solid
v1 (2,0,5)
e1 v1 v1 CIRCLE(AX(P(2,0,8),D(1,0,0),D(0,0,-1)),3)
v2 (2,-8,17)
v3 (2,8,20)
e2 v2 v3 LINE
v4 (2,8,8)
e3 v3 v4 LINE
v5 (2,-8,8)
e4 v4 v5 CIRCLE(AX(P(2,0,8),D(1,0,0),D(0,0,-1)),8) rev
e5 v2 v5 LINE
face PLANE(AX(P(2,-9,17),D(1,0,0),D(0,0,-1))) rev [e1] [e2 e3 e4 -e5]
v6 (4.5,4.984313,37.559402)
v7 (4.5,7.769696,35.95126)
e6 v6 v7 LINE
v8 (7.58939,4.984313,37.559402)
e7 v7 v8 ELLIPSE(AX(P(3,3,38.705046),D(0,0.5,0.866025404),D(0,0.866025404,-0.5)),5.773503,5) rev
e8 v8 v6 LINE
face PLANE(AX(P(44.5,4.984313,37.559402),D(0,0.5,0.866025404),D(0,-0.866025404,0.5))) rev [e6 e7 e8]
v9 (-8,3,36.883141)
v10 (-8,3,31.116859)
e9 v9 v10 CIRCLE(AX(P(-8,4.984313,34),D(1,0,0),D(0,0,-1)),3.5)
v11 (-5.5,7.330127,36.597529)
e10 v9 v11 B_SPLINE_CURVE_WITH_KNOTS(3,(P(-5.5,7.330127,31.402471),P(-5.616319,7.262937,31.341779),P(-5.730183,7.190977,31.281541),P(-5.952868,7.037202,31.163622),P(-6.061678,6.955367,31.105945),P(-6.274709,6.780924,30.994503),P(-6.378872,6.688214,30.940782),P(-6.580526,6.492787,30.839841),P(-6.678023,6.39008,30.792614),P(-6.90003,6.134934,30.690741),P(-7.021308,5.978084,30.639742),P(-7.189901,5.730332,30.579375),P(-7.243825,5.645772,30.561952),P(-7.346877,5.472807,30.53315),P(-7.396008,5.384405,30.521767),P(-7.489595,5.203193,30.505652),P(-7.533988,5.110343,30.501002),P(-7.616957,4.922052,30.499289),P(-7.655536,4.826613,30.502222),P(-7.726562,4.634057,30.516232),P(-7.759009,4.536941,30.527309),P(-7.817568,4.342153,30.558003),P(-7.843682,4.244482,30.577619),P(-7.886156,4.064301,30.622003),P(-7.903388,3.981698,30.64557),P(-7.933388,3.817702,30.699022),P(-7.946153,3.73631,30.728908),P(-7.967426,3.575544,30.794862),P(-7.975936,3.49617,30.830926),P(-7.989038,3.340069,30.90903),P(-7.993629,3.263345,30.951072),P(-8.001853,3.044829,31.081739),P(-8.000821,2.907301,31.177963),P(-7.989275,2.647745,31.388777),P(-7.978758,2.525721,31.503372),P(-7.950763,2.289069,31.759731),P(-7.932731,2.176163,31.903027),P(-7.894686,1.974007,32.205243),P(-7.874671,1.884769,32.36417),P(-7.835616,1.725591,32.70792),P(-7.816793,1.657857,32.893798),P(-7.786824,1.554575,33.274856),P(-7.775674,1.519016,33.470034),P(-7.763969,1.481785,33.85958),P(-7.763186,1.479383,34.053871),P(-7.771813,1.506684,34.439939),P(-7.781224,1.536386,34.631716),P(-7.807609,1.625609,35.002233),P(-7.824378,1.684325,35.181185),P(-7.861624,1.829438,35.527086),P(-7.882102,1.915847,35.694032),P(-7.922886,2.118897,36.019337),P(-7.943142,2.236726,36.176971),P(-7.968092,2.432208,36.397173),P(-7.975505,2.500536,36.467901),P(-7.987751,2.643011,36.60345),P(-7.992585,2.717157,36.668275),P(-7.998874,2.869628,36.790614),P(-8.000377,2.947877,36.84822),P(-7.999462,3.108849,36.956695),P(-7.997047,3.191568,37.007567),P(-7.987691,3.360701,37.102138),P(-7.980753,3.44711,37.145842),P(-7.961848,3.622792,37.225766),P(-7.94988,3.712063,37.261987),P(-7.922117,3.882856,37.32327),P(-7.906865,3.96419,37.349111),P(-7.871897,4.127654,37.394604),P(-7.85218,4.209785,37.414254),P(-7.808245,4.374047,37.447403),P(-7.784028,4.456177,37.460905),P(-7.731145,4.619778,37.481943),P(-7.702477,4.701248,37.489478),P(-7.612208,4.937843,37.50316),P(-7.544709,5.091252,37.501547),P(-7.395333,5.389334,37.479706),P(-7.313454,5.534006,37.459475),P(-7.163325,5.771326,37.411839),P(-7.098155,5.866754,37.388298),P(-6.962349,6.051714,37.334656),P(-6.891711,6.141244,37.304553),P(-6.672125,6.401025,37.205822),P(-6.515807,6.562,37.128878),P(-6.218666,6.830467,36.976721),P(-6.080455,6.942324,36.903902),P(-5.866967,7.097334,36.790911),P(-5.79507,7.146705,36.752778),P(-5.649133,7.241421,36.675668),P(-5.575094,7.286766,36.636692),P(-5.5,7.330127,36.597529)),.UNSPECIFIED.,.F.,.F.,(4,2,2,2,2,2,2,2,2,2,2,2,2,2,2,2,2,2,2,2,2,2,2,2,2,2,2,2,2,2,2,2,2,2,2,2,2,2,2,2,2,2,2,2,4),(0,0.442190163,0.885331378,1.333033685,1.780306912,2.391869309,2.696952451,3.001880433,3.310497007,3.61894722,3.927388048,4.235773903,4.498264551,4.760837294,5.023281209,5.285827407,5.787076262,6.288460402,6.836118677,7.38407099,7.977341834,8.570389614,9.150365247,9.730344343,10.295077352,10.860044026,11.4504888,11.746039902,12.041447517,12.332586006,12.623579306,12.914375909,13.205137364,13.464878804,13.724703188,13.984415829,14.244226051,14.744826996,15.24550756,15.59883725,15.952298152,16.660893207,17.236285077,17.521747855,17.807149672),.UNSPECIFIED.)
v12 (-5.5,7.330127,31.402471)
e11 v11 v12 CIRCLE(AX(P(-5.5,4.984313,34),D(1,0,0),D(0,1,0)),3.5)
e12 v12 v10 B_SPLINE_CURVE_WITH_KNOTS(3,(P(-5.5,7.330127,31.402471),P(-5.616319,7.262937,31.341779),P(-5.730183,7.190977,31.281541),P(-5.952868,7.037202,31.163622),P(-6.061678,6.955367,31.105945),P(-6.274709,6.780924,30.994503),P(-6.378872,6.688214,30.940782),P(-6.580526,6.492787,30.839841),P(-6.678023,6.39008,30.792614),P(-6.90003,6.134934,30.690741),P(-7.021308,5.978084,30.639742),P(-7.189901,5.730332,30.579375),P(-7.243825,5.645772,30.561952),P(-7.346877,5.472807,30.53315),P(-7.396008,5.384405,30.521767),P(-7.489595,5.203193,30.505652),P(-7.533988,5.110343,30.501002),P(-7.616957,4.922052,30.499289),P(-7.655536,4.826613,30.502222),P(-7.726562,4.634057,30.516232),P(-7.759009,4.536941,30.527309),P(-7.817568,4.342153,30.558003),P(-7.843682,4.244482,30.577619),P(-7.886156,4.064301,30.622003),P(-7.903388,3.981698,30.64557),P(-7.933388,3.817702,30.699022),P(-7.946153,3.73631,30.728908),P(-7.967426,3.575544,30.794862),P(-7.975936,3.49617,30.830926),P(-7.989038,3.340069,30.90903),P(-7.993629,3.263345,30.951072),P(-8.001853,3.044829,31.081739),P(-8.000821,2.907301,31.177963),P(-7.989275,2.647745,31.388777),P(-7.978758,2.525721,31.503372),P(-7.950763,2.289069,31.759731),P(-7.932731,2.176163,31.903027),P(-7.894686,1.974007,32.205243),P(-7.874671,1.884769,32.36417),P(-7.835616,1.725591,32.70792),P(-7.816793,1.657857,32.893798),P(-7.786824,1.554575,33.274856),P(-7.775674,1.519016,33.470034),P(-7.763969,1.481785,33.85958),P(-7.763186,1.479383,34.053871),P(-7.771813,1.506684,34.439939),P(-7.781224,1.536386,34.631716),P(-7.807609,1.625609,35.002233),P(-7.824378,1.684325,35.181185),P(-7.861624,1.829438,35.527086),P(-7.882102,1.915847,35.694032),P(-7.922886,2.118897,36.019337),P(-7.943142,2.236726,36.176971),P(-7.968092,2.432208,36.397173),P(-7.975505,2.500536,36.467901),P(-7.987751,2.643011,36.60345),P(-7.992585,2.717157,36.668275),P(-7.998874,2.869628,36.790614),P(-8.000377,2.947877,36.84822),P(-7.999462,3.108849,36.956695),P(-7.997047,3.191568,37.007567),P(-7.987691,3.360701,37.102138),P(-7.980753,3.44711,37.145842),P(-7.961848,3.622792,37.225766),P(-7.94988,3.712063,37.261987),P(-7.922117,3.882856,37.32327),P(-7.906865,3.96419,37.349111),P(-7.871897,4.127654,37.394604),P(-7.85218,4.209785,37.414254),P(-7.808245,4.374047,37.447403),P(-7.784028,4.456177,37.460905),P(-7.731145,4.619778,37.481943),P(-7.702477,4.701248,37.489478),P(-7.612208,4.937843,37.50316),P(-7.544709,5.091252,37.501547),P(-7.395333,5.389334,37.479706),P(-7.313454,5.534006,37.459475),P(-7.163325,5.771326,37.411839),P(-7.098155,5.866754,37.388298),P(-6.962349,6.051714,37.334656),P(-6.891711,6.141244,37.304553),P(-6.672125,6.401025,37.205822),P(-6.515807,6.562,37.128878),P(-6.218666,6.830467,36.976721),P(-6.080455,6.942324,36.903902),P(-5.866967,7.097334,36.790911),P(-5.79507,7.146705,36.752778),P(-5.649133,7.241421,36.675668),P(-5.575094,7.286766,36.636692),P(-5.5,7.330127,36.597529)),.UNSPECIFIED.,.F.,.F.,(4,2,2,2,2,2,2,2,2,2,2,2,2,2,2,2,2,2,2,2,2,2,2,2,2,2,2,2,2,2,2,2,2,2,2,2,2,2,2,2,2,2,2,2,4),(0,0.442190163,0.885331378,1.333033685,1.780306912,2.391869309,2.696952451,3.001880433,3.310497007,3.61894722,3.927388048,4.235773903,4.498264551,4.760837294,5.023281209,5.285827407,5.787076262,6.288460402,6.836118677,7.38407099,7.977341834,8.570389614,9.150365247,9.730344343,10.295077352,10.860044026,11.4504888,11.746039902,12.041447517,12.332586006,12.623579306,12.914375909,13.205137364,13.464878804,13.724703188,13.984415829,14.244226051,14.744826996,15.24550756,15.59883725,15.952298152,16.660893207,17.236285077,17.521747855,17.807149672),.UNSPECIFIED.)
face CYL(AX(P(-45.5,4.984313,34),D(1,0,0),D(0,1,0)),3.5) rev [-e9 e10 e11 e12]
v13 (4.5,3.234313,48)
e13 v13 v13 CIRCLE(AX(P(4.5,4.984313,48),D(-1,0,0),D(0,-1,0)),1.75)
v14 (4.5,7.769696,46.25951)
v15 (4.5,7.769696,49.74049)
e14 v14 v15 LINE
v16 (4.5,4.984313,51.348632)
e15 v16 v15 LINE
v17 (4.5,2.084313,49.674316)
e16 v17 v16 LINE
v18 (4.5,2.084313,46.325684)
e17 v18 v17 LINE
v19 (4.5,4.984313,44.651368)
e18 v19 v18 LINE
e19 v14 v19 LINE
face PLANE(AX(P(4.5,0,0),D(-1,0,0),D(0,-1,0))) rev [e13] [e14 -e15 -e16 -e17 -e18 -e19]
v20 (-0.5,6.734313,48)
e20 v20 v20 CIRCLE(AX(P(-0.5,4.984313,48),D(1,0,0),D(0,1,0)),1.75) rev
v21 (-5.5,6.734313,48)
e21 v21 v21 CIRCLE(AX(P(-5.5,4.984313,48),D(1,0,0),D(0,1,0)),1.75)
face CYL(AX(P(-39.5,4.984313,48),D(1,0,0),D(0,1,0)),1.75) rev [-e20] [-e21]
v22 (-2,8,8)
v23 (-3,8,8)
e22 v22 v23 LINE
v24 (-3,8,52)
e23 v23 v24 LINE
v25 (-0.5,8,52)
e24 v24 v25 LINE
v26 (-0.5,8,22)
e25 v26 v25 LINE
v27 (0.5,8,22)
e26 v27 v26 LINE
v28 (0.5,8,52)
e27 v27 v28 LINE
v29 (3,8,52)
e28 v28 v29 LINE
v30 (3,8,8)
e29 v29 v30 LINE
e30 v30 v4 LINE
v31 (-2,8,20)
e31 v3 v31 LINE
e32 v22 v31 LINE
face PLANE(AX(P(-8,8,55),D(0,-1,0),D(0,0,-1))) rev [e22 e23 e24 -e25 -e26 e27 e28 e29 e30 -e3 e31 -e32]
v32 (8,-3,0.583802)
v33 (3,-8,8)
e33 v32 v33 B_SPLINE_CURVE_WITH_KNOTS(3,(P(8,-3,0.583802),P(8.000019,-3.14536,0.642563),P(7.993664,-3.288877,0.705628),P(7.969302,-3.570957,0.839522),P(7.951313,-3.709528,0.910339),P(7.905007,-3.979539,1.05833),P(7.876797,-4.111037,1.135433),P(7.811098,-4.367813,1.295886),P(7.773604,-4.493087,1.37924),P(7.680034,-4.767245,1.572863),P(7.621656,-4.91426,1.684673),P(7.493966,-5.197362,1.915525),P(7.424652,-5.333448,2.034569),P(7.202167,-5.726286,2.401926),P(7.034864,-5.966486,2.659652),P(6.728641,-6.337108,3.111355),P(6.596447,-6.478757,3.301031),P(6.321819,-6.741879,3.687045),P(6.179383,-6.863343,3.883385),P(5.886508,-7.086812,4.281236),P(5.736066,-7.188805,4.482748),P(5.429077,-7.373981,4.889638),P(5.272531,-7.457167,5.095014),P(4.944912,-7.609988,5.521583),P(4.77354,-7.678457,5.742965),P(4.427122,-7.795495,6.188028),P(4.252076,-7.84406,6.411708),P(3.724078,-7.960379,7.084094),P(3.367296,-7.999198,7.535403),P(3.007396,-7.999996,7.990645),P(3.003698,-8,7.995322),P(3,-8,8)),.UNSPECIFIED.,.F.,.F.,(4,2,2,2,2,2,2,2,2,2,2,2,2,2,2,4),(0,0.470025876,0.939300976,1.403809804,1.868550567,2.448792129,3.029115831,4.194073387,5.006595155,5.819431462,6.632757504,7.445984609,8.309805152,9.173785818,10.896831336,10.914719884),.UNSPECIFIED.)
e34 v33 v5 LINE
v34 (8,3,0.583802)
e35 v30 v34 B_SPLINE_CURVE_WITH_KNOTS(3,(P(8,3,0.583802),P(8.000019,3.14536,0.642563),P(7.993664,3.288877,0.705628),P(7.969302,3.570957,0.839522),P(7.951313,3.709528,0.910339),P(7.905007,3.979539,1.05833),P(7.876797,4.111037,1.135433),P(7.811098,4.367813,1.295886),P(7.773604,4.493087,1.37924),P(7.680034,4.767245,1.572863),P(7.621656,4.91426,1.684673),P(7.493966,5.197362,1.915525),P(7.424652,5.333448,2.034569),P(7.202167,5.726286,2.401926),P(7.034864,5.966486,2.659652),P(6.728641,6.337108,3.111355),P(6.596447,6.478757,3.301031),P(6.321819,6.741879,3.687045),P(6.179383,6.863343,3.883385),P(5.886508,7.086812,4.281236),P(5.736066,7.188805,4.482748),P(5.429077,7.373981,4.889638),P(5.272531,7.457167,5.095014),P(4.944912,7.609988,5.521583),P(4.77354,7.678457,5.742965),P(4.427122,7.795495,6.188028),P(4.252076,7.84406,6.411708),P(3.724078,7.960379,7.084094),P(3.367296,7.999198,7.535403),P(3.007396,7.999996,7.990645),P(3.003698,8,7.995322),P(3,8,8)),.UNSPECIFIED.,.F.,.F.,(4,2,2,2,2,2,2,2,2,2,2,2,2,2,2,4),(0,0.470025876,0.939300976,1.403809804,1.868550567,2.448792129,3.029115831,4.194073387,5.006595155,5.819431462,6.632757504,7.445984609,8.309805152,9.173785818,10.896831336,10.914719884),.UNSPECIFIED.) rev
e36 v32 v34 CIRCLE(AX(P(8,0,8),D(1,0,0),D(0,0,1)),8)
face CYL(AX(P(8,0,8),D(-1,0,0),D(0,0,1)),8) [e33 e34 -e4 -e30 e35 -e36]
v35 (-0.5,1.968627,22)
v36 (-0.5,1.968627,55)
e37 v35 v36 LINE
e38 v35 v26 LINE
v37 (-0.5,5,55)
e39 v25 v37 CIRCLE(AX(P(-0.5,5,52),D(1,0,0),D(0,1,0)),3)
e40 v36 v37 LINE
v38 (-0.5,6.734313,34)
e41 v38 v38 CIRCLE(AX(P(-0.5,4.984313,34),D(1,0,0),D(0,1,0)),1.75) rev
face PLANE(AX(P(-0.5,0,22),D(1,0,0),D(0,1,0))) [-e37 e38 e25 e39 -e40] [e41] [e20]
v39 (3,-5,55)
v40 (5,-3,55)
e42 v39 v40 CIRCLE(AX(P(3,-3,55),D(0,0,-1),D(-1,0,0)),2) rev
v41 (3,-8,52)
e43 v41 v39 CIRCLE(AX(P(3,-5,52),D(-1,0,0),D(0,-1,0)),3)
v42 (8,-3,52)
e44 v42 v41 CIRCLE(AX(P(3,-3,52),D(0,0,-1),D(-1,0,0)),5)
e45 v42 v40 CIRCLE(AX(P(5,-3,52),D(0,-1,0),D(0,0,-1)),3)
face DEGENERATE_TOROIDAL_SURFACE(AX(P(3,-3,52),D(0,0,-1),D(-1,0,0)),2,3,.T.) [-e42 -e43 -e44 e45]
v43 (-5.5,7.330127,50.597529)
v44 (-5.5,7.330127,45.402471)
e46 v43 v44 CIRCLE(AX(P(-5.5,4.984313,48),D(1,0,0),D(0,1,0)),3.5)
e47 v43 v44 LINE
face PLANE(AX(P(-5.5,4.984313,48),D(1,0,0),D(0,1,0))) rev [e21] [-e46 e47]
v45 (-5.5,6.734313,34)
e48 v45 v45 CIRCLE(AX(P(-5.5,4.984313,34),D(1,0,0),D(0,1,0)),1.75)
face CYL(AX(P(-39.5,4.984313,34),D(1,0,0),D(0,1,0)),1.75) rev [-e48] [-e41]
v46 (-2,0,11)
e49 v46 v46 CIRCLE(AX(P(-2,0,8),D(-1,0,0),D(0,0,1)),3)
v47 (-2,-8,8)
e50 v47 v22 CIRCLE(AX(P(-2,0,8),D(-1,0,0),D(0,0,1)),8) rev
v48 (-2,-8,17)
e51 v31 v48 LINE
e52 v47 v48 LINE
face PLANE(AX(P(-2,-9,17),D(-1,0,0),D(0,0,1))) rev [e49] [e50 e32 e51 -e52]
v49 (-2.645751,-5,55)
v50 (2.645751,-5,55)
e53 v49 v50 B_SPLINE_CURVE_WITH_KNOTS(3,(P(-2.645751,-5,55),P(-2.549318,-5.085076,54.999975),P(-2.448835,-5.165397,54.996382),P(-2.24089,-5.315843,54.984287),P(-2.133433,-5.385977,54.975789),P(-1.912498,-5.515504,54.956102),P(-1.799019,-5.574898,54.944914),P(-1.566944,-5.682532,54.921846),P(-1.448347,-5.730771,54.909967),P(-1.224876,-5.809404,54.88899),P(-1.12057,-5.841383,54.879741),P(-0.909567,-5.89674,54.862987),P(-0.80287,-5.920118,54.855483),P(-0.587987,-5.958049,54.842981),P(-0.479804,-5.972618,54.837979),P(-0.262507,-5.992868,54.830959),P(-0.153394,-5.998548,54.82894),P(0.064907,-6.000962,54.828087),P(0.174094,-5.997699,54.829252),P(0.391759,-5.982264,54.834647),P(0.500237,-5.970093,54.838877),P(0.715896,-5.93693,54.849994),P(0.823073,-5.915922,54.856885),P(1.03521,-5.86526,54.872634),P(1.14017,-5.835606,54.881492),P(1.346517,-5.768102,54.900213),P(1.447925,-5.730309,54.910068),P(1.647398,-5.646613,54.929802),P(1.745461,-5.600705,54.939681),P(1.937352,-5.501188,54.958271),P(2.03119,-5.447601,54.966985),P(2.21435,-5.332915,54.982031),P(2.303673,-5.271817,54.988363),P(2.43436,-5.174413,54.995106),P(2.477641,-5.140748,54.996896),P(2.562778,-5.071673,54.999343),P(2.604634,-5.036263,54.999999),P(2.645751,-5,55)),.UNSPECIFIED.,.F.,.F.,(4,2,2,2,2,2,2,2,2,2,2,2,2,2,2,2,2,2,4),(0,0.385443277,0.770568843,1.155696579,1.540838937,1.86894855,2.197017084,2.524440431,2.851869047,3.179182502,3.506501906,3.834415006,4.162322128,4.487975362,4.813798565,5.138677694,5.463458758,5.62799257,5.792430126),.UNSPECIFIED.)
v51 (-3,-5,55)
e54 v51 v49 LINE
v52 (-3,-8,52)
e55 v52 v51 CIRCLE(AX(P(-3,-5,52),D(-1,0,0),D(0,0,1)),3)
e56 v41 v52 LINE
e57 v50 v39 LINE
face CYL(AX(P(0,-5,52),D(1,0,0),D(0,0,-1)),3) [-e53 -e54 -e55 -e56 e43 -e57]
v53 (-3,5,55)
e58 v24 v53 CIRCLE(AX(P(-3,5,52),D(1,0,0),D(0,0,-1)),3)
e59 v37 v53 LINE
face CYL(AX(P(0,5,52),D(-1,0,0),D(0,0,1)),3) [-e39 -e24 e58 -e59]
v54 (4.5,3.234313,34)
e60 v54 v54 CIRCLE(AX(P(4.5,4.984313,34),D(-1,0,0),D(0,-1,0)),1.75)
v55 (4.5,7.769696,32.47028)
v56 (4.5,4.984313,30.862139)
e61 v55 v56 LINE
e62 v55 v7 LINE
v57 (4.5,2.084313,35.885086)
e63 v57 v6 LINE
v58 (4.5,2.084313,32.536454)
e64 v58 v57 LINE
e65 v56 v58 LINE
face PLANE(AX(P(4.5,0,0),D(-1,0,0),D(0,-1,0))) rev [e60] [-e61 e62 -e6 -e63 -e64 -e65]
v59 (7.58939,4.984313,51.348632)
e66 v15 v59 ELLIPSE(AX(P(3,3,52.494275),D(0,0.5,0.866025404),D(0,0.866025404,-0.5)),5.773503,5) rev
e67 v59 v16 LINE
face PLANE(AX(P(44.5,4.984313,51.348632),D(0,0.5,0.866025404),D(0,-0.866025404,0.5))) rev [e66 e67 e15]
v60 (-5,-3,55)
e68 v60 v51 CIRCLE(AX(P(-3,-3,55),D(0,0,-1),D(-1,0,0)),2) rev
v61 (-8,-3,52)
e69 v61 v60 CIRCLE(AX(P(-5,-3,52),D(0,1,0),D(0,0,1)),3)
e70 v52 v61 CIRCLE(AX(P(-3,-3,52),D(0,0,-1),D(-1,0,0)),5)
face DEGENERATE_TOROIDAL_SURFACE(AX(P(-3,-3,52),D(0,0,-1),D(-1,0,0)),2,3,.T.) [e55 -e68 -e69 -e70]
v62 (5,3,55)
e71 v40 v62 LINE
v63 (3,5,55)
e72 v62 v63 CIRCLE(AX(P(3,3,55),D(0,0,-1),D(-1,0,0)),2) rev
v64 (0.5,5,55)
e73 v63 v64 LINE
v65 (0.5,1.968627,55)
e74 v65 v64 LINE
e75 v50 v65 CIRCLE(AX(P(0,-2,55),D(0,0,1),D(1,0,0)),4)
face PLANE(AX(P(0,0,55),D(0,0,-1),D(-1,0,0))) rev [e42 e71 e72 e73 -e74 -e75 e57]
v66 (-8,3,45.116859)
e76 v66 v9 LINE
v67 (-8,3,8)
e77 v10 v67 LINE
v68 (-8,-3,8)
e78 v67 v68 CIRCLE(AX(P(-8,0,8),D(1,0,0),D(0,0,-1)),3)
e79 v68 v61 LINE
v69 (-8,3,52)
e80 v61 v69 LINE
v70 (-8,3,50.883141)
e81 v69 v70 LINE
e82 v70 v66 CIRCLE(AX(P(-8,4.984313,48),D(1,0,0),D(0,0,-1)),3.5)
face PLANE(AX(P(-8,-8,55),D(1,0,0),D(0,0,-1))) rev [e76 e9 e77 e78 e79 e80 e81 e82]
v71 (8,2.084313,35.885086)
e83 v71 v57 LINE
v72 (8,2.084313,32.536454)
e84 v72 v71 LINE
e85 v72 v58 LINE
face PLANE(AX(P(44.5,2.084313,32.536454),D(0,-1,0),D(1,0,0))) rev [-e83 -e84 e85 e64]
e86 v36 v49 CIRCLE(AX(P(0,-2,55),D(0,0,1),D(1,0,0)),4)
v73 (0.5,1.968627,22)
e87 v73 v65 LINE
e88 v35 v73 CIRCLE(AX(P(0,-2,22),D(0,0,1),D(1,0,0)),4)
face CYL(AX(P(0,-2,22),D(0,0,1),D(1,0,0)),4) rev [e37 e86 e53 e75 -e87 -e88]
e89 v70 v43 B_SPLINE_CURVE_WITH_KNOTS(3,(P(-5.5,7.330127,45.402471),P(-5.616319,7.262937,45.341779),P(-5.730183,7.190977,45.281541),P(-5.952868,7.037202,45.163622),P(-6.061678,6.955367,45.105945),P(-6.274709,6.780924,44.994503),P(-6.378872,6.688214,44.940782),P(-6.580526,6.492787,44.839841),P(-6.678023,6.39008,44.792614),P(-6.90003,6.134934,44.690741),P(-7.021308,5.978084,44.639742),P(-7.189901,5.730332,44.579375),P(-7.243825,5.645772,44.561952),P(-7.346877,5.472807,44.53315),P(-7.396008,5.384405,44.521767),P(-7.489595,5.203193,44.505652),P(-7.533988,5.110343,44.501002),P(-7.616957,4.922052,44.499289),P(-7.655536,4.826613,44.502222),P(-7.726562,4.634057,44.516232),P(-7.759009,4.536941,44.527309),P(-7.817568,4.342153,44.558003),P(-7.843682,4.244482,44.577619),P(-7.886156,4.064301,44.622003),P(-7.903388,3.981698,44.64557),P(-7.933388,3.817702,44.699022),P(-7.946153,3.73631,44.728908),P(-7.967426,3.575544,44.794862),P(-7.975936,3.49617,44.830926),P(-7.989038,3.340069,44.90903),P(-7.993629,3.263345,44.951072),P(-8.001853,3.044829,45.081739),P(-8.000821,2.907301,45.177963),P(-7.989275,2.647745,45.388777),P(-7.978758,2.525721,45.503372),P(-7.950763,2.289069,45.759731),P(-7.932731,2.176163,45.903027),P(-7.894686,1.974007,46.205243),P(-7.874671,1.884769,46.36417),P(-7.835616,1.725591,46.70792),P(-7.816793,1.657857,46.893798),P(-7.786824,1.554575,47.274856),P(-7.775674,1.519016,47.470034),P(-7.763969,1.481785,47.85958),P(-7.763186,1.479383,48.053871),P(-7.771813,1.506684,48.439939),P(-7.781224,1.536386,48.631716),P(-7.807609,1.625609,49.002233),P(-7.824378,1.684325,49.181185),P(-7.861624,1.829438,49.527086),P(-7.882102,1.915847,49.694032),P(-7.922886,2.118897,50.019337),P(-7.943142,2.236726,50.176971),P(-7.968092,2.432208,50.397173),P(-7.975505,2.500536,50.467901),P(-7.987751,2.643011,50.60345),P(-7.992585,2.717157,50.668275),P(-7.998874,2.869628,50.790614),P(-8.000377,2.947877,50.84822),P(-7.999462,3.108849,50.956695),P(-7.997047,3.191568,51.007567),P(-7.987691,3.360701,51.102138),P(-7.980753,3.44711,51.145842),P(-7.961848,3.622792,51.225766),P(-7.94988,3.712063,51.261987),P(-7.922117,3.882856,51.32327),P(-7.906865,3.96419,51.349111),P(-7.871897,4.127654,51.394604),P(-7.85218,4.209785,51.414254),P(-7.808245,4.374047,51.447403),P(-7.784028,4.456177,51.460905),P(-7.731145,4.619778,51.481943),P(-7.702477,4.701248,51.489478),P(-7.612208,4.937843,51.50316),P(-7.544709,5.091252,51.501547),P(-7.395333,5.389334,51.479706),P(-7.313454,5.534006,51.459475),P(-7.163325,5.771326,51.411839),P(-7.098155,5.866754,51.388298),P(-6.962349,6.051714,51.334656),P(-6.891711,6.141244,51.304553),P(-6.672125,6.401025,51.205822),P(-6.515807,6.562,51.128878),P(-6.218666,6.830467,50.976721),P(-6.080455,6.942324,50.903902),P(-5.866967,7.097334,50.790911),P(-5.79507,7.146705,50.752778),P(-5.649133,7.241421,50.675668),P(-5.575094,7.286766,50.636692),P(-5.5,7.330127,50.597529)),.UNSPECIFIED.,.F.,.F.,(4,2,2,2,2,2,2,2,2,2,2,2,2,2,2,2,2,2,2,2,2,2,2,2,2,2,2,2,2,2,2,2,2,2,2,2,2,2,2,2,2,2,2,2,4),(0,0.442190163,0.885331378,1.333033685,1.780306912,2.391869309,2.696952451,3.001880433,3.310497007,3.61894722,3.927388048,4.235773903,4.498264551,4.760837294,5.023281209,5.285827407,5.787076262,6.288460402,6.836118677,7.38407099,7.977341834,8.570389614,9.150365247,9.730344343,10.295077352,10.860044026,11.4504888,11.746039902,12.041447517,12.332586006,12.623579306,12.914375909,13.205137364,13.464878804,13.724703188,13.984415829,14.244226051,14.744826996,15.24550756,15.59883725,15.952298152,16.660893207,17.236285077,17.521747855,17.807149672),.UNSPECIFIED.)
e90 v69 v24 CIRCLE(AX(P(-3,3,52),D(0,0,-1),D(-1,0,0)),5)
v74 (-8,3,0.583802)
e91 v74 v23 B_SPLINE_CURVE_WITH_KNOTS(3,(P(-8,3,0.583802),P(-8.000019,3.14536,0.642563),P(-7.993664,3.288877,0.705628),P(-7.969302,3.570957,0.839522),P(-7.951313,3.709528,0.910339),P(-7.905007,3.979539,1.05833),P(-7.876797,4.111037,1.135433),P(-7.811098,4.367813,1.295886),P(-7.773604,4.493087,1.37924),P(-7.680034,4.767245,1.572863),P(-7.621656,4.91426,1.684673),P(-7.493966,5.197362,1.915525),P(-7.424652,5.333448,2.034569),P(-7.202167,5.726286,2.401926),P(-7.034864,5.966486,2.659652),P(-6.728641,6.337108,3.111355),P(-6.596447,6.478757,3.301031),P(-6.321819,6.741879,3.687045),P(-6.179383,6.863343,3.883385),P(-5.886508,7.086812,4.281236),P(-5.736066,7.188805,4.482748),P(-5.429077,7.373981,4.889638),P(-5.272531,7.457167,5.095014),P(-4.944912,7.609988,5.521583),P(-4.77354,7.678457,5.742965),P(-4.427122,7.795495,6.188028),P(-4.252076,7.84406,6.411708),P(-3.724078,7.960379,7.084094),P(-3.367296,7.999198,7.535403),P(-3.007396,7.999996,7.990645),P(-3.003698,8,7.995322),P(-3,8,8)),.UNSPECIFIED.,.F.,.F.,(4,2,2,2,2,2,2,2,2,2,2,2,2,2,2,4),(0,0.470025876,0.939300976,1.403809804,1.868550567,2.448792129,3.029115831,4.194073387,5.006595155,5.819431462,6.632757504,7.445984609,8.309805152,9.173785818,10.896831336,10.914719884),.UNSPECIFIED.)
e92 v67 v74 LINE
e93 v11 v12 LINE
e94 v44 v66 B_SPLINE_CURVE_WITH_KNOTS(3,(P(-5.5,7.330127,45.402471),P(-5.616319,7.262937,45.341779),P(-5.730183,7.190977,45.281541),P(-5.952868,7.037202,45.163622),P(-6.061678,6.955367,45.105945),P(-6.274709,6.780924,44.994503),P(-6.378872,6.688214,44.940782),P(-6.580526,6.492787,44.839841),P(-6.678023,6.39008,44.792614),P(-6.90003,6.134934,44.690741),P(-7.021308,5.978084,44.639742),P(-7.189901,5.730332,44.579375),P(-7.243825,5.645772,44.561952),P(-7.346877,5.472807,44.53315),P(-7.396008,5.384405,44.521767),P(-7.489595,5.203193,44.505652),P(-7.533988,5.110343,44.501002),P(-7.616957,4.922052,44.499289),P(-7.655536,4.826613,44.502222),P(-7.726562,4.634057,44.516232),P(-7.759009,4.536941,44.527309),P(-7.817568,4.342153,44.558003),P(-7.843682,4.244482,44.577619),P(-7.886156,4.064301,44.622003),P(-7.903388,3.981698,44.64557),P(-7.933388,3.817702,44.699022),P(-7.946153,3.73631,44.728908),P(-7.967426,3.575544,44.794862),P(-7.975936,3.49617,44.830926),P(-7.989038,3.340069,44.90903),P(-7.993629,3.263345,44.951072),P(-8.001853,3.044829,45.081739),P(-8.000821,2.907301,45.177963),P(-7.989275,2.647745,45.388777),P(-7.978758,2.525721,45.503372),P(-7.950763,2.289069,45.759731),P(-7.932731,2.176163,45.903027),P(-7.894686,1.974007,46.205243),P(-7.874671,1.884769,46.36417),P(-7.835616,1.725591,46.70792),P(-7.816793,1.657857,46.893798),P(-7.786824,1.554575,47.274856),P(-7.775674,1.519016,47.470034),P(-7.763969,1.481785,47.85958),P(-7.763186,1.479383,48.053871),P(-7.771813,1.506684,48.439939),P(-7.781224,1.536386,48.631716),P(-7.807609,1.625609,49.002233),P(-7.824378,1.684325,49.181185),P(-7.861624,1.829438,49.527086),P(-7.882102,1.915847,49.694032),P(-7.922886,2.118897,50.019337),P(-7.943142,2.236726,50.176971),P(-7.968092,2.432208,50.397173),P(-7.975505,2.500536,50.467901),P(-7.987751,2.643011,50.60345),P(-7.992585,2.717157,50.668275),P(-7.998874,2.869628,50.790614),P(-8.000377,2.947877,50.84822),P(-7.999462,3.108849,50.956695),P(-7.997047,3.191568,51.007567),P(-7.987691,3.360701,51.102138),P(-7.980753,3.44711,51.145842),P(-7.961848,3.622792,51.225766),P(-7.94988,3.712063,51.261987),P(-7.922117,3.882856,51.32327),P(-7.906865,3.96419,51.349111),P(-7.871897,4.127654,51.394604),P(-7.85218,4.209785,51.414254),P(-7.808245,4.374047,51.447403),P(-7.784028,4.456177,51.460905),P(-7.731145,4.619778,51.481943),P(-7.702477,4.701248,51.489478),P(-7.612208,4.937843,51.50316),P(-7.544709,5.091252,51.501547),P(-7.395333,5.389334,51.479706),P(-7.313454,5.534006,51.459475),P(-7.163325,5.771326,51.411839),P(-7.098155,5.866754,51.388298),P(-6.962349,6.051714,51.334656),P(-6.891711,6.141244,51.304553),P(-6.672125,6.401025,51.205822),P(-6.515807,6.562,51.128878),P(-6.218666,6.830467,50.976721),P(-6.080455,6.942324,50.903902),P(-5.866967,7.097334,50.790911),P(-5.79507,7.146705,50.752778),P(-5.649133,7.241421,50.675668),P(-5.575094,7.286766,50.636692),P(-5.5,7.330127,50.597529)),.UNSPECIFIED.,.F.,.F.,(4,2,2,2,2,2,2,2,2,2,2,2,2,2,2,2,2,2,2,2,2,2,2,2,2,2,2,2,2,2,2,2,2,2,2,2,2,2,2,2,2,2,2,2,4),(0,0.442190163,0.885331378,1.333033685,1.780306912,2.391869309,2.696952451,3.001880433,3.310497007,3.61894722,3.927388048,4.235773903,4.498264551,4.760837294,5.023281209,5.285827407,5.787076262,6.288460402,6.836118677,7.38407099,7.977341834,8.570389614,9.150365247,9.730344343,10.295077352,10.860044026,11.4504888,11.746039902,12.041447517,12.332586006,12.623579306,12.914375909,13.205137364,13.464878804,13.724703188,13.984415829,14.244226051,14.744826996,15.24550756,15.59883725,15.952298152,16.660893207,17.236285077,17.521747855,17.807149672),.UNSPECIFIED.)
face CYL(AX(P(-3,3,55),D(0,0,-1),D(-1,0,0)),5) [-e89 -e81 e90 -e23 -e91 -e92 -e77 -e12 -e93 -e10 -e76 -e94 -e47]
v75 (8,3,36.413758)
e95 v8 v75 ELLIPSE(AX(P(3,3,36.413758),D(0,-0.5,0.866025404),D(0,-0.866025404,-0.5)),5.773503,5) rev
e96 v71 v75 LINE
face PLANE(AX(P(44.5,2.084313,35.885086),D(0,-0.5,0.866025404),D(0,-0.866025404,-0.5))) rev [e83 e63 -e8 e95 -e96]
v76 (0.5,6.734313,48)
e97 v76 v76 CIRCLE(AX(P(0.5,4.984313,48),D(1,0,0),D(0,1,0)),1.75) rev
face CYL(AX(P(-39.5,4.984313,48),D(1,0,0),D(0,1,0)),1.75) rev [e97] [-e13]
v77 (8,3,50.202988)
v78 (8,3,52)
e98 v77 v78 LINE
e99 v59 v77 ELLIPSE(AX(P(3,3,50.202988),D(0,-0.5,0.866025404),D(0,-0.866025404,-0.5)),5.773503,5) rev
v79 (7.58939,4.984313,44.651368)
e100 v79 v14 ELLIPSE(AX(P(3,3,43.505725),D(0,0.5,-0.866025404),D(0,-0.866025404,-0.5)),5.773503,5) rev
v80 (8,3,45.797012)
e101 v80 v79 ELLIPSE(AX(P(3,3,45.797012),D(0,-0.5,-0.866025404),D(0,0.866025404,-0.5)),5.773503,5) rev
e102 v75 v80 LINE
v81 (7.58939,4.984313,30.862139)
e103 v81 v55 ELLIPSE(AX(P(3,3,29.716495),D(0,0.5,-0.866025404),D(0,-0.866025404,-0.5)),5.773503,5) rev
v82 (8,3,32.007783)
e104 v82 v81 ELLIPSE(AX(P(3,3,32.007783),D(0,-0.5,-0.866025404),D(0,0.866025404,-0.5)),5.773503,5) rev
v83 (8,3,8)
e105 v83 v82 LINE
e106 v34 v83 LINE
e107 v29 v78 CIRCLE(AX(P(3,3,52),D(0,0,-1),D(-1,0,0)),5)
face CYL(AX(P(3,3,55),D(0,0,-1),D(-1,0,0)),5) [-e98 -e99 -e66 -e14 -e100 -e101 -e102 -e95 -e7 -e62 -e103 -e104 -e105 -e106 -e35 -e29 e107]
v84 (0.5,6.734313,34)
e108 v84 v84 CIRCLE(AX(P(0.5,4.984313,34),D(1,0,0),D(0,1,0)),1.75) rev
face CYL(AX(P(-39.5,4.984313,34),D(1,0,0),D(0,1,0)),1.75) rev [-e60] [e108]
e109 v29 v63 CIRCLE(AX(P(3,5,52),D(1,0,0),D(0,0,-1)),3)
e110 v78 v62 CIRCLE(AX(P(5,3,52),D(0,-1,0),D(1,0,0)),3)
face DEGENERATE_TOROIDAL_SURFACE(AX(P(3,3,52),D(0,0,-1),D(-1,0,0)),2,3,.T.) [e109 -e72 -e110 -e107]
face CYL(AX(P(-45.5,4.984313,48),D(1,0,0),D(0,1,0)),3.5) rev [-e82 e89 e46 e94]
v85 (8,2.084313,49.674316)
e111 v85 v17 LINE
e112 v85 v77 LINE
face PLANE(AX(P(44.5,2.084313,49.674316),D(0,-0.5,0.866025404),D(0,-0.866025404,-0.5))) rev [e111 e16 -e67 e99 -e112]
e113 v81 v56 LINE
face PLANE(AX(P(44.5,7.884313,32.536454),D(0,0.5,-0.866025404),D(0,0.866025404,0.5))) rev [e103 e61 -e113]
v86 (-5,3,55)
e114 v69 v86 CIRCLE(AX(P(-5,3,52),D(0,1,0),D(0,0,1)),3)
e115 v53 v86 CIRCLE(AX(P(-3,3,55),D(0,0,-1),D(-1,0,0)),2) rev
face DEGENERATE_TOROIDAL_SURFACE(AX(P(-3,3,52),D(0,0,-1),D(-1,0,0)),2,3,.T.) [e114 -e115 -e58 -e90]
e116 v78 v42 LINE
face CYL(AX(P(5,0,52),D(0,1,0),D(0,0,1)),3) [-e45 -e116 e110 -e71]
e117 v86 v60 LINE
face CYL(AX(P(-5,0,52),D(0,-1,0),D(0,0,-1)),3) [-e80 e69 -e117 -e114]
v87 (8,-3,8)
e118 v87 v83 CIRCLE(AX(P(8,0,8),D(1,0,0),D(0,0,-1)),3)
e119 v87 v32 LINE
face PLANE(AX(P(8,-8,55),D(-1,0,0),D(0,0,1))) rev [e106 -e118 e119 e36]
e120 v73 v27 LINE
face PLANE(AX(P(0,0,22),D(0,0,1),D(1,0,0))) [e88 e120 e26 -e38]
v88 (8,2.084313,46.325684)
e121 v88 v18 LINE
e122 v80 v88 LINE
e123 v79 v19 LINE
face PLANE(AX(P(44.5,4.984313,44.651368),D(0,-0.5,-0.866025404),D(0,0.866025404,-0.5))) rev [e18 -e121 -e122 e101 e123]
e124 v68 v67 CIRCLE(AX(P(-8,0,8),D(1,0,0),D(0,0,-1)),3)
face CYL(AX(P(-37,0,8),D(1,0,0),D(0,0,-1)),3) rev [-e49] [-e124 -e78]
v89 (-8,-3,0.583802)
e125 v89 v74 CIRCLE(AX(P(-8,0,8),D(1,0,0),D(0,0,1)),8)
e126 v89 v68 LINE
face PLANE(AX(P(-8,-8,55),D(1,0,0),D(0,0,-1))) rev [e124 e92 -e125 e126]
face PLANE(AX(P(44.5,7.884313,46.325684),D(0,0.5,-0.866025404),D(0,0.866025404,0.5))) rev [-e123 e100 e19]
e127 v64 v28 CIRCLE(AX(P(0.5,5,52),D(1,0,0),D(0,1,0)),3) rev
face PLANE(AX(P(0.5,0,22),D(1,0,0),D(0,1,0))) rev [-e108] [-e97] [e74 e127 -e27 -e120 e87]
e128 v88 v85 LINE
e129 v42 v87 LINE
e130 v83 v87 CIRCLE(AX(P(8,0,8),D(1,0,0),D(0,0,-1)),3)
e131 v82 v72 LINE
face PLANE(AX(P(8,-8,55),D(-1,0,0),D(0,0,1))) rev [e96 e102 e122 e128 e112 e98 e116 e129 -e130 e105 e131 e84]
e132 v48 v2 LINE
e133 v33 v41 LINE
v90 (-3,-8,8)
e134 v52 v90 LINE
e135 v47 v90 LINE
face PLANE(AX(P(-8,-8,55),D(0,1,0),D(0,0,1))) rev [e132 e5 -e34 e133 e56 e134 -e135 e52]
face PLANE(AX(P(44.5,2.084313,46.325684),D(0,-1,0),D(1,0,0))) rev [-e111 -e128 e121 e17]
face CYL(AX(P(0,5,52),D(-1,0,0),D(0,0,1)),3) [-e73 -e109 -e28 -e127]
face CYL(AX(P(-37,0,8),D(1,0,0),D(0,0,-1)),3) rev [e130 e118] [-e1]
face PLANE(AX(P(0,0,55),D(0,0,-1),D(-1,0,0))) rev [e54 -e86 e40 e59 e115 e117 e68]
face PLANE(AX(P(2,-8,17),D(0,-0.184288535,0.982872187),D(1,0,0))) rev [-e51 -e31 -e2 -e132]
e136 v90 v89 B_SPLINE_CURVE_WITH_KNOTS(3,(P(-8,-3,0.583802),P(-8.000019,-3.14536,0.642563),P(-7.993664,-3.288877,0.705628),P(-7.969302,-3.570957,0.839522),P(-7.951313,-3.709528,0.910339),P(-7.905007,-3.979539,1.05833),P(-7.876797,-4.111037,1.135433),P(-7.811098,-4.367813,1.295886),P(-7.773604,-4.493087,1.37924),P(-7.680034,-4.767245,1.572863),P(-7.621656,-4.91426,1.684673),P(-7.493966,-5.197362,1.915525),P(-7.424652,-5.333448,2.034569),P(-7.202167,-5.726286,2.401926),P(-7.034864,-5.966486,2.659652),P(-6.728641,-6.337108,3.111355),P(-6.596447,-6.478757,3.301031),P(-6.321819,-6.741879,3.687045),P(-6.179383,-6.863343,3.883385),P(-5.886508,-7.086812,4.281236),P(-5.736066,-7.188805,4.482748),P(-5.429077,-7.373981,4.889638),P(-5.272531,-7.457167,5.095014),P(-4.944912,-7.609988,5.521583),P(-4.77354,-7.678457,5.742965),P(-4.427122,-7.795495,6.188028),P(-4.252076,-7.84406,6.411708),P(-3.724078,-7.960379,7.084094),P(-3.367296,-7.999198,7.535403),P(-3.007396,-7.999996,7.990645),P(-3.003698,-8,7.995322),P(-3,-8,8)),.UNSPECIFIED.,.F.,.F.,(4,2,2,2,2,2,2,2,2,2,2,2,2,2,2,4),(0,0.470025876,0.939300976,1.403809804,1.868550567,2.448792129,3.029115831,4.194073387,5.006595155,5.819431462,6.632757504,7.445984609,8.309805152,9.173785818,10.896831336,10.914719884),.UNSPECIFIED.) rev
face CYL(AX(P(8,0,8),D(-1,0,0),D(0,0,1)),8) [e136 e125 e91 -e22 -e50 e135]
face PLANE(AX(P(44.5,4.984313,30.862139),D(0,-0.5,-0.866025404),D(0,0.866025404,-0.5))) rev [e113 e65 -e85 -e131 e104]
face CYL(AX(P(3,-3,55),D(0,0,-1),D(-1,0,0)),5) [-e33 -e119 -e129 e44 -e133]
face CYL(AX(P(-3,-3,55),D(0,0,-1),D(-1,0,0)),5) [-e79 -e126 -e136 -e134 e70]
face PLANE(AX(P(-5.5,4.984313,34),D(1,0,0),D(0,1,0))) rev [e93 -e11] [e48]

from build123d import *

# Parameters (mm, degrees)
SKETCH1_W               = 16
SKETCH1_H               = 16
BOSS_EXTRUDE1_DEPTH     = 55
SKETCH2_W               = 4
SKETCH2_H               = 17
CUT_EXTRUDE1_DEPTH      = 17
SKETCH3_R               = 3
CUT_EXTRUDE2_DEPTH      = 45
CUT_EXTRUDE3_DEPTH      = 33
FILLET1_R               = 5
FILLET2_R               = 3
CUT_EXTRUDE4_DEPTH      = 40
CUT_EXTRUDE4_DEPTH_BACK = 40
SKETCH5_R               = 1.75
CUT_EXTRUDE5_START      = -4
CUT_EXTRUDE5_DEPTH      = 40
CUT_EXTRUDE6_START      = -5
SKETCH7_R               = 3.5
CUT_EXTRUDE6_DEPTH      = 40
CUT_EXTRUDE7_DEPTH      = 58.835975073
CHAMFER1_SIZE2          = 16
CHAMFER1_SIZE           = 3


# Some blends are built 0.0001 mm under size
with BuildPart() as part:
    # Sketch1 → Boss-Extrude1 (new body)
    with BuildSketch(Plane.XY):
        Rectangle(SKETCH1_W, SKETCH1_H)
    extrude(amount=BOSS_EXTRUDE1_DEPTH)

    # Sketch2 → Cut-Extrude1 (cut)
    with BuildSketch(Plane(origin=(0, 8, 0), x_dir=(1, 0, 0), z_dir=(0, 1, 0))):
        with Locations((0, -8.5)):
            Rectangle(SKETCH2_W, SKETCH2_H)
    extrude(amount=-CUT_EXTRUDE1_DEPTH, mode=Mode.SUBTRACT)

    # Sketch3 → Cut-Extrude2 (cut)
    with BuildSketch(Plane(origin=(8, 0, 0), x_dir=(0, 0, -1), z_dir=(1, 0, 0))):
        with Locations((-8, 0)):
            Circle(SKETCH3_R)
    extrude(amount=-CUT_EXTRUDE2_DEPTH, mode=Mode.SUBTRACT)

    # Sketch4 → Cut-Extrude3 (cut)
    with BuildSketch(Plane.XY.offset(55)):
        with BuildLine():
            Line((0.5, 1.968626967), (0.5, 0.424558432))
            Line((0.5, 0.424558432), (-0.5, 0.424558432))
            Line((-0.5, 0.424558432), (-0.5, 1.968626967))
            ThreePointArc((-0.5, 1.968626967), (-2.645751311, -5), (4, -2))
            ThreePointArc((4, -2), (3, 0.645751311), (0.5, 1.968626967))
        make_face()
        with BuildLine():
            Line((-0.5, 0.424558432), (0.5, 0.424558432))
            Line((0.5, 0.424558432), (0.5, 1.968626967))
            ThreePointArc((0.5, 1.968626967), (0, 2), (-0.5, 1.968626967))
            Line((-0.5, 1.968626967), (-0.5, 0.424558432))
        make_face()
        with BuildLine():
            ThreePointArc((-0.5, 1.968626967), (0, 2), (0.5, 1.968626967))
            Line((0.5, 1.968626967), (0.5, 8))
            Line((0.5, 8), (-0.5, 8))
            Line((-0.5, 8), (-0.5, 1.968626967))
        make_face()
    extrude(amount=-CUT_EXTRUDE3_DEPTH, mode=Mode.SUBTRACT)

    # Fillet1
    fillet1_edges = [part.edges().sort_by_distance(p)[0] for p in [
        (8, -8, 27.5),
        (-8, -8, 27.5),
        (-8, 8, 27.5),
        (8, 8, 27.5),
    ]]
    fillet(fillet1_edges, radius=FILLET1_R - 0.0001)  # a hair under: the kernel refuses the full size

    # Fillet2
    # the kernel refuses this fillet: 3 mm, written as the material it takes off along each edge
    with BuildSketch(Plane(origin=(7, 8, 55), x_dir=(0, -1, 0), z_dir=(-1, 0, 0)), Plane(origin=(3.0001, 8, 55), x_dir=(0, -1, 0), z_dir=(-1, 0, 0))) as fillet2_piece_1:
        with BuildLine():
            CenterArc((FILLET2_R, -FILLET2_R), FILLET2_R, 90, 90)
            Line((0, -FILLET2_R), (0, 0))
            Line((0, 0), (FILLET2_R, 0))
        make_face()
    extrude(amount=10.0001, mode=Mode.SUBTRACT)
    with BuildSketch(Plane(origin=(8, -3.0001, 55), x_dir=(-1, 0, 0), z_dir=(0, 1, 0)), Plane(origin=(-8, 3.0001, 55), x_dir=(1, 0, 0), z_dir=(0, -1, 0))) as fillet2_piece_2:
        with BuildLine():
            CenterArc((FILLET2_R, -FILLET2_R), FILLET2_R, 90, 90)
            Line((0, -FILLET2_R), (0, 0))
            Line((0, 0), (FILLET2_R, 0))
        make_face()
    extrude(amount=6.0002, mode=Mode.SUBTRACT)
    with BuildSketch(Plane(origin=(-3.0001, -8, 55), x_dir=(0, 0, -1), z_dir=(1, 0, 0))) as fillet2_piece_3:
        with BuildLine():
            CenterArc((FILLET2_R, FILLET2_R), FILLET2_R, 180, 90)
            Line((0, FILLET2_R), (0, 0))
            Line((0, 0), (FILLET2_R, 0))
        make_face()
    extrude(amount=6.0002, mode=Mode.SUBTRACT)
    with BuildSketch(Plane(origin=(-3.0001, -3.0001, 55), x_dir=(0, -1, 0), z_dir=(1, 0, 0))) as fillet2_piece_4:
        with BuildLine():
            CenterArc((4.9999 - FILLET2_R, FILLET2_R), FILLET2_R, 270, 90)
            Line((4.9999 - FILLET2_R, 0), (4.9999, 0))
            Line((4.9999, 0), (4.9999, FILLET2_R))
        make_face()
    revolve(axis=Axis((-3.0001, -3.0001, 55), (0, 0, -1)), revolution_arc=90, mode=Mode.SUBTRACT)
    with BuildSketch(Plane(origin=(3.0001, -3.0001, 55), x_dir=(0, -1, 0), z_dir=(-1, 0, 0))) as fillet2_piece_5:
        with BuildLine():
            CenterArc((4.9999 - FILLET2_R, -FILLET2_R), FILLET2_R, 0, 90)
            Line((4.9999, -FILLET2_R), (4.9999, 0))
            Line((4.9999, 0), (4.9999 - FILLET2_R, 0))
        make_face()
    revolve(axis=Axis((3.0001, -3.0001, 55), (0, 0, 1)), revolution_arc=90, mode=Mode.SUBTRACT)
    with BuildSketch(Plane(origin=(-3.0001, 3.0001, 55), x_dir=(-1, 0, 0), z_dir=(0, -1, 0))) as fillet2_piece_6:
        with BuildLine():
            CenterArc((4.9999 - FILLET2_R, FILLET2_R), FILLET2_R, 270, 90)
            Line((4.9999, FILLET2_R), (4.9999, 0))
            Line((4.9999, 0), (4.9999 - FILLET2_R, 0))
        make_face()
    revolve(axis=Axis((-3.0001, 3.0001, 55), (0, 0, -1)), revolution_arc=90, mode=Mode.SUBTRACT)
    with BuildSketch(Plane(origin=(3.0001, 3.0001, 55), x_dir=(1, 0, 0), z_dir=(0, -1, 0))) as fillet2_piece_7:
        with BuildLine():
            CenterArc((4.9999 - FILLET2_R, -FILLET2_R), FILLET2_R, 0, 90)
            Line((4.9999, -FILLET2_R), (4.9999, 0))
            Line((4.9999, 0), (4.9999 - FILLET2_R, 0))
        make_face()
    revolve(axis=Axis((3.0001, 3.0001, 55), (0, 0, 1)), revolution_arc=90, mode=Mode.SUBTRACT)

    # Sketch5 → Cut-Extrude4 (cut, two sides: drawn at the far end of the back side and taken through both)
    with BuildSketch(Plane.ZY.offset(-0.5).offset(-CUT_EXTRUDE4_DEPTH_BACK)):
        with Locations(Location((48, 4.984313483, 0), (0, 0, 90))):
            Circle(SKETCH5_R)
        with Locations(Location((34, 4.984313483, 0), (0, 0, 90))):
            Circle(SKETCH5_R)
    extrude(amount=CUT_EXTRUDE4_DEPTH + CUT_EXTRUDE4_DEPTH_BACK, mode=Mode.SUBTRACT)

    # Sketch6 → Cut-Extrude5 (cut)
    with BuildSketch(Plane.ZY.offset(-0.5).offset(CUT_EXTRUDE5_START)):
        Polygon((49.674315781, 7.884313483), (46.325684219, 7.884313483), (44.651368439, 4.984313483), (46.325684219, 2.084313483), (49.674315781, 2.084313483), (51.348631561, 4.984313483), align=None)
        Polygon((35.885086056, 7.884313483), (32.536454495, 7.884313483), (30.862138714, 4.984313483), (32.536454495, 2.084313483), (35.885086056, 2.084313483), (37.559401836, 4.984313483), align=None)
    extrude(amount=-CUT_EXTRUDE5_DEPTH, mode=Mode.SUBTRACT)

    # Sketch7 → Cut-Extrude6 (cut)
    with BuildSketch(Plane(origin=(-0.5, 0, 0), x_dir=(0, 0, -1), z_dir=(1, 0, 0)).offset(CUT_EXTRUDE6_START)):
        with Locations((-48, 4.984313483)):
            Circle(SKETCH7_R)
        with Locations((-34, 4.984313483)):
            Circle(SKETCH7_R)
    extrude(amount=-CUT_EXTRUDE6_DEPTH, mode=Mode.SUBTRACT)

    # Sketch8 → Cut-Extrude7 (cut, through all)
    with BuildSketch(Plane.ZY.offset(8)):
        with BuildLine():
            Line((8, 8), (8.268392061, 14.01403494))
            ThreePointArc((8.268392061, 14.01403494), (-6.01403494, 0.268392061), (7.731607939, -14.01403494))
            Line((7.731607939, -14.01403494), (8, -8))
            ThreePointArc((8, -8), (0, 0), (8, 8))
        make_face()
    extrude(amount=-CUT_EXTRUDE7_DEPTH, mode=Mode.SUBTRACT)

    # Chamfer1
    chamfer1_edges = [part.edges().sort_by_distance(p)[0] for p in [
        (0, 8, 17),
    ]]
    chamfer1_side = [part.faces().sort_by_distance(p)[0] for p in [
        (0, 8, 17.06),
    ]]
    chamfer(chamfer1_edges, length=CHAMFER1_SIZE - 0.0001, length2=CHAMFER1_SIZE2 - 0.0001, reference=chamfer1_side[0])  # a hair under: the kernel refuses the full size


solid = part.part
